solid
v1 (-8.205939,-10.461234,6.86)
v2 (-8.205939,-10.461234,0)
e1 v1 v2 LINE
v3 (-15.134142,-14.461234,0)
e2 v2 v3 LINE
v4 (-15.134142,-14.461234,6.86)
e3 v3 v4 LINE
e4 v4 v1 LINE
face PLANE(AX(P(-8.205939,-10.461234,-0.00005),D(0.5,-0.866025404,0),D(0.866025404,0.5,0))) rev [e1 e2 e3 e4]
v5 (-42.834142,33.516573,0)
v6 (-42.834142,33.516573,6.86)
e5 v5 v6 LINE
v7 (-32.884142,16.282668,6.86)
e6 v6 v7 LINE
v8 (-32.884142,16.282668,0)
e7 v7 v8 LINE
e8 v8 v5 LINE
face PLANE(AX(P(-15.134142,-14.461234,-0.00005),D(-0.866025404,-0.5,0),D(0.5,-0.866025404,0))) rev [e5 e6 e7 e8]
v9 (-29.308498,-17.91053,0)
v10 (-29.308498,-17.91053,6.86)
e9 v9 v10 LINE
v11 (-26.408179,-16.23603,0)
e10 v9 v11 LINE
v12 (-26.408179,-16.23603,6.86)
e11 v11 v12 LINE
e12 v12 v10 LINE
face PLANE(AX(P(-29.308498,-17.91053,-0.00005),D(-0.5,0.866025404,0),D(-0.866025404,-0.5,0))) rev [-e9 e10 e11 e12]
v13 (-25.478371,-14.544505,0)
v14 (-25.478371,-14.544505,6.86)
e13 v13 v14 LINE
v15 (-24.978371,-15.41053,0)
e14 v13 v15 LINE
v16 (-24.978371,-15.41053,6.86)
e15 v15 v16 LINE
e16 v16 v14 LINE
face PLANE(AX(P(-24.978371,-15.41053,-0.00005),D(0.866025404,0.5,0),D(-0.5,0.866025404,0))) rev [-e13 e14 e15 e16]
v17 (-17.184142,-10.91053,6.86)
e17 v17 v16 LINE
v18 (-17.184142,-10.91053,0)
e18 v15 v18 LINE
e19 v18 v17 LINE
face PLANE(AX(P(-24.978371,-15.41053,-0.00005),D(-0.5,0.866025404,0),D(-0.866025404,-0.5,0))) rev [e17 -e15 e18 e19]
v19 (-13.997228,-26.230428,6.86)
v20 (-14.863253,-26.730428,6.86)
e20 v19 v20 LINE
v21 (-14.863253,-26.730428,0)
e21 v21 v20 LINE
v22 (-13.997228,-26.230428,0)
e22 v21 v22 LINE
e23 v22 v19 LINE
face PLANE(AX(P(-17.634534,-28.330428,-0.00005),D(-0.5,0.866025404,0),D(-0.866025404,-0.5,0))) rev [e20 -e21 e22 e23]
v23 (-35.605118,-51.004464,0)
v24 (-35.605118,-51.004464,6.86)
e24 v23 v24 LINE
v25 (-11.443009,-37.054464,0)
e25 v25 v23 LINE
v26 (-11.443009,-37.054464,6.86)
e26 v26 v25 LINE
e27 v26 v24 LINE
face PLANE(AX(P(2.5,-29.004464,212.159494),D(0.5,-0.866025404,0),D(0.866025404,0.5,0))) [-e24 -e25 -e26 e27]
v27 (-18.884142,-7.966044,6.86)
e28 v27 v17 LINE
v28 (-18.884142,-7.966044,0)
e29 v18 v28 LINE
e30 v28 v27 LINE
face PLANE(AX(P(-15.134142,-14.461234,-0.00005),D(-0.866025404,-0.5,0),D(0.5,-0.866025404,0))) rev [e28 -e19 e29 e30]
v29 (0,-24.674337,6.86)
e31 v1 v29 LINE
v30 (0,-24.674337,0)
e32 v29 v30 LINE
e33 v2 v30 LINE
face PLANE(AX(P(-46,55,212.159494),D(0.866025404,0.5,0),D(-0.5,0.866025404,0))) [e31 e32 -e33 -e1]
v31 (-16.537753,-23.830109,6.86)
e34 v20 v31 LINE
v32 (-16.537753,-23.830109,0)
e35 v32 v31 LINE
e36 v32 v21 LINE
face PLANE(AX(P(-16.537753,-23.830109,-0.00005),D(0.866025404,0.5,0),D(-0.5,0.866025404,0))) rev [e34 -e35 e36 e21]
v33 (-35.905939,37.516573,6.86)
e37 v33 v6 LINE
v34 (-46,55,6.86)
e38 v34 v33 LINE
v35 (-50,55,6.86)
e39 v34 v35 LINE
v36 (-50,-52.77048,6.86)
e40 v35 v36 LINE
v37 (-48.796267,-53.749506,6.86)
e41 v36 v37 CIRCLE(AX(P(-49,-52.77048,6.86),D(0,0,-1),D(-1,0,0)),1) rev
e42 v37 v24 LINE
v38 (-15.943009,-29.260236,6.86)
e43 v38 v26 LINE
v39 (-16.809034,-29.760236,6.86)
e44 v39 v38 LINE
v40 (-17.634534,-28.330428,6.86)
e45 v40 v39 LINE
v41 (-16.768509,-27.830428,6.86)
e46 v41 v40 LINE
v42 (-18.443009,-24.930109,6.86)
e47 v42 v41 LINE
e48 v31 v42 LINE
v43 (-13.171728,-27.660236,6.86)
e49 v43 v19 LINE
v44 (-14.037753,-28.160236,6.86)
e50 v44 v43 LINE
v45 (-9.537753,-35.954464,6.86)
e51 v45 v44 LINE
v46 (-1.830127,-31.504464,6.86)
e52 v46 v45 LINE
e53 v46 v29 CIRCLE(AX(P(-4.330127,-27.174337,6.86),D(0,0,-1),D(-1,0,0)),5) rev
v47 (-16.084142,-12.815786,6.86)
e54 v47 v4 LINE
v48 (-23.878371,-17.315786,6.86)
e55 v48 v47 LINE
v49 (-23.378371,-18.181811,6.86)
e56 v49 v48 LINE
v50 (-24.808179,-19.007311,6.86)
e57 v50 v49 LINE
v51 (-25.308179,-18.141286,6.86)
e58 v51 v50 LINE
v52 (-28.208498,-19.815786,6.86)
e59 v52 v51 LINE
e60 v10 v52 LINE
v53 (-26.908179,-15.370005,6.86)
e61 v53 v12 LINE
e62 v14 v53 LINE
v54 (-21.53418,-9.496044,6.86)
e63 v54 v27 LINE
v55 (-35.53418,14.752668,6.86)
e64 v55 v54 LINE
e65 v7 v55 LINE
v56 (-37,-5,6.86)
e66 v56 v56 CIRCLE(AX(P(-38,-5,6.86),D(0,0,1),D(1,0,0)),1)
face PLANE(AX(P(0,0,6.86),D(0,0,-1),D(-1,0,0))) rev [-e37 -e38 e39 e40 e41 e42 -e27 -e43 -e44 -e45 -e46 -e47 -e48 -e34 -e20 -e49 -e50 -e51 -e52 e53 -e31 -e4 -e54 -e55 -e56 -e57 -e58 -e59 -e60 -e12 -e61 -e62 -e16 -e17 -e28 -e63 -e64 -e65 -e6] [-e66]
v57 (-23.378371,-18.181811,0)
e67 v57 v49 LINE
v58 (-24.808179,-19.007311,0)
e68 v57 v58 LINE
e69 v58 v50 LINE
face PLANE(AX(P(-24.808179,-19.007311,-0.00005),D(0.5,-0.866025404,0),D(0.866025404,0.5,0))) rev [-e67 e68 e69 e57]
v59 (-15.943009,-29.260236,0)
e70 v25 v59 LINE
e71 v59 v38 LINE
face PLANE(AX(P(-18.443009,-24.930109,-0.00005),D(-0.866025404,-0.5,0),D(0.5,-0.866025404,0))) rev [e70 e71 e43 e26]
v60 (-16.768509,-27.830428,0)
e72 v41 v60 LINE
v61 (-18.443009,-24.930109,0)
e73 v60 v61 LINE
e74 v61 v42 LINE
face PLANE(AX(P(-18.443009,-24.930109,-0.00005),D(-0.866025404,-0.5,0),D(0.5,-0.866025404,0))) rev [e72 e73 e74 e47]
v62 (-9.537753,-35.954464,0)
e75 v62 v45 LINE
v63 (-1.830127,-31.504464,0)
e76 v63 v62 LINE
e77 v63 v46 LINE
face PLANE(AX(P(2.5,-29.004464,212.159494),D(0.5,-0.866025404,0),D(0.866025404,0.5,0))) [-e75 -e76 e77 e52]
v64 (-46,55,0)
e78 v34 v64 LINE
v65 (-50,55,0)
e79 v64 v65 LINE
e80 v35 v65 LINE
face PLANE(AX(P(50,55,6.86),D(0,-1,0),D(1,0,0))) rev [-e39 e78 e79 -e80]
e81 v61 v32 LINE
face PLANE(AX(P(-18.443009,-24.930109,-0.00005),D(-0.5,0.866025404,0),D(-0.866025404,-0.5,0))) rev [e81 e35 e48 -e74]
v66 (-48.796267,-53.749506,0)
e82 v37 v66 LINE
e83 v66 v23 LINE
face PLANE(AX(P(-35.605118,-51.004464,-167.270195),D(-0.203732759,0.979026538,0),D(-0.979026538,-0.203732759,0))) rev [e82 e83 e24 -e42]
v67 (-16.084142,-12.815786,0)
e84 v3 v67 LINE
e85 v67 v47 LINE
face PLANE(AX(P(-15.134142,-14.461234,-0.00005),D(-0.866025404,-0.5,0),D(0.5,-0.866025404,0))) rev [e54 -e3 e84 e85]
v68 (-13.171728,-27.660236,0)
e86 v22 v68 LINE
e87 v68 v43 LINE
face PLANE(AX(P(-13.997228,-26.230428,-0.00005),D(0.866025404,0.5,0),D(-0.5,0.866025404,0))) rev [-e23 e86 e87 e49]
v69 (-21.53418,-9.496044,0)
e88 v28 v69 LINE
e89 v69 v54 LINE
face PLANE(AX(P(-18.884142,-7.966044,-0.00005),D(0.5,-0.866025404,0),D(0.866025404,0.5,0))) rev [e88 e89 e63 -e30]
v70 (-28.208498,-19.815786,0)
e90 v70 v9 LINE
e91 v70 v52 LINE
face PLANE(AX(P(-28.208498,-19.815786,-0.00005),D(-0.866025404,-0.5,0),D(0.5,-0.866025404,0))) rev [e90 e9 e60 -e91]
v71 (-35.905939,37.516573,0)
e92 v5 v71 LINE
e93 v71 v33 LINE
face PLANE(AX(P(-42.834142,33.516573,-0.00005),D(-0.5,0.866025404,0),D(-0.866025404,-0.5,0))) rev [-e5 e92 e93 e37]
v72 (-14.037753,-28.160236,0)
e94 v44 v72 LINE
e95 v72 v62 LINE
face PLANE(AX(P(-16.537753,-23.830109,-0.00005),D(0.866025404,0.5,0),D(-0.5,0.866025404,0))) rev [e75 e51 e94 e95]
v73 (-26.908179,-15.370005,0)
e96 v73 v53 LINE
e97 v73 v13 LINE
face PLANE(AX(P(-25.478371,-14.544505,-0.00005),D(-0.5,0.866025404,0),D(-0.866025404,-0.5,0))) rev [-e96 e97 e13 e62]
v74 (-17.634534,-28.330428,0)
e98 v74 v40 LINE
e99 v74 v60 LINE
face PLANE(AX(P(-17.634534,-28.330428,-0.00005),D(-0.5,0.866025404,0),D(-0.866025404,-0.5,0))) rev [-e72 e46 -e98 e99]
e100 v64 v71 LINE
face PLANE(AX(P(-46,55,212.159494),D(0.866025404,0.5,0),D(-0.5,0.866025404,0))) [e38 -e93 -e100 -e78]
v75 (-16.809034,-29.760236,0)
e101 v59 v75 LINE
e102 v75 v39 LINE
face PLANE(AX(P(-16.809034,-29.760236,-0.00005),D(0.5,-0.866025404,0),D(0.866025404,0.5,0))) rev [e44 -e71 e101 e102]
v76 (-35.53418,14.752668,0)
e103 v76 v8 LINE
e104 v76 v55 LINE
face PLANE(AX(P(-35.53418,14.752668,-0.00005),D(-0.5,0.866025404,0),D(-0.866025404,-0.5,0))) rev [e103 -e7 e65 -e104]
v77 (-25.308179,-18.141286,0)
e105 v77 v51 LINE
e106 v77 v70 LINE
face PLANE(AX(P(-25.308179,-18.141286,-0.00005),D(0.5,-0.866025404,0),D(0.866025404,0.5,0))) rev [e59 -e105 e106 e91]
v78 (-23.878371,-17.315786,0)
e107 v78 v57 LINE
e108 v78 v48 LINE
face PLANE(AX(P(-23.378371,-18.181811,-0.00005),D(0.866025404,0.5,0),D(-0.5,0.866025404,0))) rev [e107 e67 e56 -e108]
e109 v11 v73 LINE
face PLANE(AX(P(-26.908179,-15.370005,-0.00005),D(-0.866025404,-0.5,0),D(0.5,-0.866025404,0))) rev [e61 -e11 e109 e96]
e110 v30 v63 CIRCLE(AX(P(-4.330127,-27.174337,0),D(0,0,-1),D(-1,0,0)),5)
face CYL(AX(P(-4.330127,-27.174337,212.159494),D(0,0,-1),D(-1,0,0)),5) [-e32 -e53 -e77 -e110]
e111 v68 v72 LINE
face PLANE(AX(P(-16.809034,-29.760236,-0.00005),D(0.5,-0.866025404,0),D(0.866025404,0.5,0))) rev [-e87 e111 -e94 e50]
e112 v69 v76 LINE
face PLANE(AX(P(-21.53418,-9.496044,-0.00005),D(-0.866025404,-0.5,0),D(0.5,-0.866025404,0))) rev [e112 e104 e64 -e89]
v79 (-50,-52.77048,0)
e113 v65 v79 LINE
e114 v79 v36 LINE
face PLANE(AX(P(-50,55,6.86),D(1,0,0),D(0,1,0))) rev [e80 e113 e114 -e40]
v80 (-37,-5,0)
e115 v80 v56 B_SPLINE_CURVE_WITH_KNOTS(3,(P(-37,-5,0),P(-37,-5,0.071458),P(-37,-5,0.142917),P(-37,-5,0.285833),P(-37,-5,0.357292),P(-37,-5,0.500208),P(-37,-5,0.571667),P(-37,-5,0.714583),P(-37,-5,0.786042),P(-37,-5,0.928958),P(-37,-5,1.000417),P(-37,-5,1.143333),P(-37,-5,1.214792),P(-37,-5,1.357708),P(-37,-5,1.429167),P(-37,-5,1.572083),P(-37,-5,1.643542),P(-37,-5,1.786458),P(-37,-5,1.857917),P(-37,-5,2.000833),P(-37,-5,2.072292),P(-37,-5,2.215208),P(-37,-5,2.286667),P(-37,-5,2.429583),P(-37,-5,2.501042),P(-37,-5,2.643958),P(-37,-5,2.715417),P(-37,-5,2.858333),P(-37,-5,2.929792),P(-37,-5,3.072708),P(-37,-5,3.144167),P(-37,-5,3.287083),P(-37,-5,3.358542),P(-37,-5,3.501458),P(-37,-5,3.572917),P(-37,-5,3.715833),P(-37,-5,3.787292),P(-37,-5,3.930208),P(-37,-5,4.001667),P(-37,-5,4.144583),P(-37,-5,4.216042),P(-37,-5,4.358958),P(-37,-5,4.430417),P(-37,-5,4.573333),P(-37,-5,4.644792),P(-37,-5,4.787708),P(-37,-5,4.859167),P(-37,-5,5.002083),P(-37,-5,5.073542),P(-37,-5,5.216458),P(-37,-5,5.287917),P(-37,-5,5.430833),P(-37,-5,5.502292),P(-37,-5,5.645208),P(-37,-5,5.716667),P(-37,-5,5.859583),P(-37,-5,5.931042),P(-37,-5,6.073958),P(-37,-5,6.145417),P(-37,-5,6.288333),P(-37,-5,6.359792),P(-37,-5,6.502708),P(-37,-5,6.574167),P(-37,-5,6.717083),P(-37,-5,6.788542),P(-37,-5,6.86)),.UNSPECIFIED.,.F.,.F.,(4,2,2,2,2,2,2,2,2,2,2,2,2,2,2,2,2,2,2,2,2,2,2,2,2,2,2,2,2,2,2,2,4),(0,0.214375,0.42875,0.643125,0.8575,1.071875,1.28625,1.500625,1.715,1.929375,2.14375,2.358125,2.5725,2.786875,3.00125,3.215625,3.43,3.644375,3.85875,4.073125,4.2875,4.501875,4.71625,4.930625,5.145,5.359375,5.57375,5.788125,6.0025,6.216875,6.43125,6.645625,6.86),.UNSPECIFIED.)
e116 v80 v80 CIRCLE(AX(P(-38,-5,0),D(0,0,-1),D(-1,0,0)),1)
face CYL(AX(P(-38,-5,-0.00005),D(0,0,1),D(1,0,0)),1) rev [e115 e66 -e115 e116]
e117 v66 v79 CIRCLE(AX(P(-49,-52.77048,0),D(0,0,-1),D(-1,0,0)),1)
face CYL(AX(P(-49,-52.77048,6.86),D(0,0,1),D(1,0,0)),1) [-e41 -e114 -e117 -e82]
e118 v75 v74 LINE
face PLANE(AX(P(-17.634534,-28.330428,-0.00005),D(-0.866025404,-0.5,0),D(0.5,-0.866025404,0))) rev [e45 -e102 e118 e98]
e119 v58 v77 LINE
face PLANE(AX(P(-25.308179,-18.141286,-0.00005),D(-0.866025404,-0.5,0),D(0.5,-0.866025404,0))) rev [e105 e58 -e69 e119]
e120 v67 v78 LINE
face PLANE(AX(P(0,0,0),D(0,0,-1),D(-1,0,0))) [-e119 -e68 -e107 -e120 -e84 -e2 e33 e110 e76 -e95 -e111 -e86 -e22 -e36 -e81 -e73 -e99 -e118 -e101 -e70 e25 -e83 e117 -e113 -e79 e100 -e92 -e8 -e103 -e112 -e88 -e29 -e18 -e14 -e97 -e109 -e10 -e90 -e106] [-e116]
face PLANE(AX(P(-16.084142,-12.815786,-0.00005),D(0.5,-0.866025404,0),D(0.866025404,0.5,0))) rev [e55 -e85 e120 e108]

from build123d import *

# Parameters (mm, degrees)
SKETCH1_W                = 100
SKETCH1_H                = 110
BOSS_EXTRUDE1_DEPTH      = 6.86
BOSS_EXTRUDE2_DEPTH      = 6.86
CUT_EXTRUDE1_DEPTH       = 84.419927529
CUT_EXTRUDE1_DEPTH_BACK  = 84.419927529
CUT_EXTRUDE5_DEPTH       = 84.419927529
CUT_EXTRUDE6_DEPTH       = 84.419927529
SKETCH7_W                = 42
SKETCH7_H                = 3.55
CUT_EXTRUDE7_DEPTH       = 84.419927529
SKETCH8_W                = 5
SKETCH8_H                = 7.62
CUT_EXTRUDE8_DEPTH       = 84.419927529
CUT_EXTRUDE9_DEPTH       = 84.419927529
LPATTERN1_COUNT          = 2
LPATTERN1_PITCH          = 49.4
SKETCH15_W               = 6.5
SKETCH15_H               = 9.5
BOSS_EXTRUDE3_DEPTH      = 6.86
CUT_EXTRUDE14_START      = -6.86
CUT_EXTRUDE14_DEPTH      = 6.86
BOSS_EXTRUDE4_DEPTH      = 6.86
FILLET3_R                = 5
FILLET4_R                = 7
CUT_EXTRUDE11_DEPTH      = 84.419927529
BOSS_EXTRUDE5_DEPTH      = 6.86
CUT_EXTRUDE12_DEPTH      = 84.419927529
CUT_EXTRUDE12_DEPTH_BACK = 84.419927529
SKETCH21_R               = 1
CUT_EXTRUDE13_DEPTH      = 84.419927529
CUT_EXTRUDE15_DEPTH      = 84.419927529
CUT_EXTRUDE15_DEPTH_BACK = 84.419927529
CUT_EXTRUDE16_DEPTH      = 84.419927529
CUT_EXTRUDE16_DEPTH_BACK = 84.419927529
FILLET2_R                = 1
BOSS_EXTRUDE6_DEPTH      = 6.86
CUT_EXTRUDE17_DEPTH      = 84.419927529
BOSS_EXTRUDE9_DEPTH      = 6.86


# Read off the part's stored shape, not the designer's step: Cut-Extrude14
with BuildPart() as part:
    # Sketch1 → Boss-Extrude1 (new body)
    with BuildSketch(Plane.XY):
        Rectangle(SKETCH1_W, SKETCH1_H)
    extrude(amount=BOSS_EXTRUDE1_DEPTH)

    # Sketch14 → Boss-Extrude2 (add)
    with BuildSketch(Plane.XY.offset(6.86)):
        with BuildLine():
            Line((-50, 44), (-56.9, 44))
            Line((-56.9, 44), (-57.252653961, 46))
            Line((-57.252653961, 46), (-60.252653961, 46))
            ThreePointArc((-60.252653961, 46), (-62.140394827, 27.177051725), (-56.9, 9))
            Line((-56.9, 9), (-50, 9))
            Line((-50, 9), (-50, 44))
        make_face()
    extrude(amount=-BOSS_EXTRUDE2_DEPTH)

    # Sketch9 → Cut-Extrude1 (cut, two sides: drawn at the far end of the back side and taken through both)
    with BuildSketch(Plane.XY.offset(6.86).offset(-CUT_EXTRUDE1_DEPTH_BACK)):
        Polygon((-202.691345573, 326.397371639), (-46, 55), (2.5, -29.004464167), (-49.825975731, -59.214880341), (-321.22334737, -215.906225914), (291.08659924, -349.739606366), (409.618601037, 192.563991188), align=None)
    extrude(amount=CUT_EXTRUDE1_DEPTH + CUT_EXTRUDE1_DEPTH_BACK, mode=Mode.SUBTRACT)

    # Sketch11 → Cut-Extrude5 (cut, through all)
    with BuildSketch(Plane.XY.offset(6.86)):
        Polygon((-35.90593882, 37.516573181), (-8.20593882, -10.461234188), (-15.13414205, -14.461234188), (-42.83414205, 33.516573181), align=None)
    extrude(amount=-CUT_EXTRUDE5_DEPTH, mode=Mode.SUBTRACT)

    # Sketch12 → Cut-Extrude6 (cut, through all)
    with BuildSketch(Plane.XY.offset(6.86)):
        Polygon((-18.88414205, -7.96604366), (-21.534179786, -9.49604366), (-35.534179786, 14.752667646), (-32.88414205, 16.282667646), align=None)
    extrude(amount=-CUT_EXTRUDE6_DEPTH, mode=Mode.SUBTRACT)

    # Sketch7 → Cut-Extrude7 (cut, through all)
    with BuildSketch(Plane.XY.offset(6.86)):
        with Locations((-50, -34)):
            Rectangle(SKETCH7_W, SKETCH7_H)
    extrude(amount=-CUT_EXTRUDE7_DEPTH, mode=Mode.SUBTRACT)

    # Sketch8 → Cut-Extrude8 (cut, through all)
    with BuildSketch(Plane.XY.offset(6.86)):
        with Locations((-36.5, -34)):
            Rectangle(SKETCH8_W, SKETCH8_H)
    extrude(amount=-CUT_EXTRUDE8_DEPTH, mode=Mode.SUBTRACT)

    # Sketch13 → Cut-Extrude9 (cut, through all)
    with BuildSketch(Plane.XY.offset(6.86)):
        Polygon((-41.88414205, 31.871124914), (-40.78414205, 29.965869026), (-48.578370684, 25.465869026), (-48.078370684, 24.599843622), (-49.508178626, 23.774343622), (-50.008178626, 24.640369026), (-52.908497703, 22.965869026), (-54.008497703, 24.871124914), (-51.108178626, 26.545624914), (-51.608178626, 27.411650318), (-50.178370684, 28.237150318), (-49.678370684, 27.371124914), align=None)
        Polygon((-39.45593882, 43.665353548), (-38.35593882, 41.76009766), (-46.150167454, 37.26009766), (-45.650167454, 36.394072256), (-47.079975396, 35.568572256), (-47.579975396, 36.43459766), (-50.480294473, 34.76009766), (-51.580294473, 36.665353548), (-48.679975396, 38.339853548), (-49.179975396, 39.205878952), (-47.750167454, 40.031378952), (-47.250167454, 39.165353548), align=None)
        Polygon((-18.443009001, -24.930108514), (-11.443009001, -37.054464167), (-9.537753113, -35.954464167), (-16.537753113, -23.830108514), align=None)
    cut_extrude9 = extrude(amount=-CUT_EXTRUDE9_DEPTH, mode=Mode.SUBTRACT)

    # LPattern1: Cut-Extrude9 ×2
    with Locations(*[Vector(0.4999999999999939, -0.8660254037844421, 0) * (i * LPATTERN1_PITCH) for i in range(1, LPATTERN1_COUNT)]):
        add(cut_extrude9, mode=Mode.SUBTRACT)

    # Sketch15 → Boss-Extrude3 (add)
    with BuildSketch(Plane.XY.offset(6.86)):
        with Locations((-53.25, -19.75)):
            Rectangle(SKETCH15_W, SKETCH15_H)
    extrude(amount=-BOSS_EXTRUDE3_DEPTH)

    # Cut-Extrude14 outline → Cut-Extrude14 (cut)
    with BuildSketch(Plane.XY.offset(6.86).offset(CUT_EXTRUDE14_START)):
        Polygon((-56.5, -15), (-56.5, -16.500643242), (-50, -15), align=None)
    extrude(amount=CUT_EXTRUDE14_DEPTH, mode=Mode.SUBTRACT)

    # Sketch16 → Boss-Extrude4 (add)
    with BuildSketch(Plane.XY.offset(6.86)):
        Polygon((-35.605117767, -51.004464167), (-34.105117767, -53.602540378), (-36.525588833, -55), (-42.525588833, -55), (-44.558274136, -51.479285778), align=None)
    extrude(amount=-BOSS_EXTRUDE4_DEPTH)

    # Fillet3
    fillet3_edges = [part.edges().sort_by_distance(p)[0] for p in [
        (2.5, -29.004464167, 3.43),
    ]]
    fillet(fillet3_edges, radius=FILLET3_R)

    # Fillet4
    fillet4_edges = [part.edges().sort_by_distance(p)[0] for p in [
        (-56.9, 9, 3.43),
    ]]
    fillet(fillet4_edges, radius=FILLET4_R)

    # Sketch18 → Cut-Extrude11 (cut, through all)
    with BuildSketch(Plane.XY.offset(6.86)):
        Polygon((-17.634534405, -28.330427591), (-13.997227709, -26.230427591), (-13.171727709, -27.660235533), (-16.809034405, -29.760235533), align=None)
    extrude(amount=-CUT_EXTRUDE11_DEPTH, mode=Mode.SUBTRACT)

    # Sketch19 → Boss-Extrude5 (add)
    with BuildSketch(Plane.XY.offset(6.86)):
        Polygon((-24.334179786, -4.646301399), (-23.234179786, -6.551557287), (-25.780294473, -8.021557287), (-26.880294473, -6.116301399), align=None)
    extrude(amount=-BOSS_EXTRUDE5_DEPTH)

    # Sketch20 → Cut-Extrude12 (cut, two sides: drawn at the far end of the back side and taken through both)
    with BuildSketch(Plane.XY.offset(6.86).offset(-CUT_EXTRUDE12_DEPTH_BACK)):
        Polygon((-50, 55), (-50, 44), (-48.060403212, 55), align=None)
    extrude(amount=CUT_EXTRUDE12_DEPTH + CUT_EXTRUDE12_DEPTH_BACK, mode=Mode.SUBTRACT)

    # Sketch21 → Cut-Extrude13 (cut, through all)
    with BuildSketch(Plane.XY.offset(6.86)):
        with Locations((-38, -5)):
            Circle(SKETCH21_R)
    extrude(amount=-CUT_EXTRUDE13_DEPTH, mode=Mode.SUBTRACT)

    # Sketch23 → Cut-Extrude15 (cut, two sides: drawn at the far end of the back side and taken through both)
    with BuildSketch(Plane.XY.offset(6.86).offset(-CUT_EXTRUDE15_DEPTH_BACK)):
        Polygon((207.425051562, 16.452548282), (-35.605117767, -51.004464167), (-50, -55), (-293.030169328, -122.457012449), (-158.11614443, -608.517351106), (342.33907646, -469.607790375), align=None)
    extrude(amount=CUT_EXTRUDE15_DEPTH + CUT_EXTRUDE15_DEPTH_BACK, mode=Mode.SUBTRACT)

    # Sketch25 → Cut-Extrude16 (cut, two sides: drawn at the far end of the back side and taken through both)
    with BuildSketch(Plane(origin=(0, 0, 0), x_dir=(-1, 0, 0), z_dir=(0, 0, -1)).offset(-CUT_EXTRUDE16_DEPTH_BACK)):
        Polygon((-209.546353054, 0.01089), (35.605117767, -51.004464167), (50, -54), (295.15147082, -105.015354167), (193.120762486, -595.318295807), (-311.577061387, -490.29205164), align=None)
    extrude(amount=CUT_EXTRUDE16_DEPTH + CUT_EXTRUDE16_DEPTH_BACK, mode=Mode.SUBTRACT)

    # Fillet2
    fillet2_edges = [part.edges().sort_by_distance(p)[0] for p in [
        (-60.252653961, 46, 3.43),
        (-56.5, -24.5, 3.43),
        (-56.5, -16.500643242, 3.43),
        (-50, -54, 3.43),
    ]]
    fillet(fillet2_edges, radius=FILLET2_R)

    # Sketch26 → Boss-Extrude6 (add)
    with BuildSketch(Plane(origin=(0, 0, 0), x_dir=(-1, 0, 0), z_dir=(0, 0, -1))):
        with BuildLine():
            Line((56.5, -15), (50, -15))
            Line((50, -15), (55.724951054, -16.321709094))
            ThreePointArc((55.724951054, -16.321709094), (56.282608157, -16.673564522), (56.5, -17.296079159))
            Line((56.5, -17.296079159), (56.5, -15))
        make_face()
        Polygon((47.579975396, 36.43459766), (50, 35.037395803), (50, 37.577736987), (48.679975396, 38.339853548), (49.179975396, 39.205878952), (47.750167454, 40.031378952), (47.250167454, 39.165353548), (39.45593882, 43.665353548), (38.35593882, 41.76009766), (46.150167454, 37.26009766), (45.650167454, 36.394072256), (47.079975396, 35.568572256), align=None)
        Polygon((49.678370684, 27.371124914), (41.88414205, 31.871124914), (40.78414205, 29.965869026), (48.578370684, 25.465869026), (48.078370684, 24.599843622), (49.508178626, 23.774343622), (50, 24.62620323), (50, 27.92820323), align=None)
        with BuildLine():
            ThreePointArc((56.5, -23.5), (56.207106781, -24.207106781), (55.5, -24.5))
            Line((55.5, -24.5), (56.5, -24.5))
            Line((56.5, -24.5), (56.5, -23.5))
        make_face()
    extrude(amount=-BOSS_EXTRUDE6_DEPTH)

    # Sketch26<3> → Cut-Extrude17 (cut, through all)
    with BuildSketch(Plane(origin=(0, 0, 0), x_dir=(-1, 0, 0), z_dir=(0, 0, -1))):
        with BuildLine():
            Line((50, 35.037395803), (50, 27.92820323))
            Line((50, 27.92820323), (50.178370684, 28.237150318))
            Line((50.178370684, 28.237150318), (51.608178626, 27.411650318))
            Line((51.608178626, 27.411650318), (51.108178626, 26.545624914))
            Line((51.108178626, 26.545624914), (54.008497703, 24.871124914))
            Line((54.008497703, 24.871124914), (52.908497703, 22.965869026))
            Line((52.908497703, 22.965869026), (50.008178626, 24.640369026))
            Line((50.008178626, 24.640369026), (50, 24.62620323))
            Line((50, 24.62620323), (50, 9))
            Line((50, 9), (52.380008746, 9))
            ThreePointArc((52.380008746, 9), (56.324728806, 10.217337668), (58.897432775, 13.445947531))
            ThreePointArc((58.897432775, 13.445947531), (62.283923616, 29.230647449), (60.464218102, 45.271649399))
            ThreePointArc((60.464218102, 45.271649399), (60.105291207, 45.797386167), (59.50182182, 46))
            Line((59.50182182, 46), (57.252653961, 46))
            Line((57.252653961, 46), (56.9, 44))
            Line((56.9, 44), (50, 44))
            Line((50, 44), (50, 37.577736987))
            Line((50, 37.577736987), (51.580294473, 36.665353548))
            Line((51.580294473, 36.665353548), (50.480294473, 34.76009766))
            Line((50.480294473, 34.76009766), (50, 35.037395803))
        make_face()
        with BuildLine():
            Line((55.724951054, -16.321709094), (50, -15))
            Line((50, -15), (50, -24.5))
            Line((50, -24.5), (55.5, -24.5))
            ThreePointArc((55.5, -24.5), (56.207106781, -24.207106781), (56.5, -23.5))
            Line((56.5, -23.5), (56.5, -17.296079159))
            ThreePointArc((56.5, -17.296079159), (56.282608157, -16.673564522), (55.724951054, -16.321709094))
        make_face()
        with BuildLine():
            Line((56.5, -15), (50, -15))
            Line((50, -15), (55.724951054, -16.321709094))
            ThreePointArc((55.724951054, -16.321709094), (56.282608157, -16.673564522), (56.5, -17.296079159))
            Line((56.5, -17.296079159), (56.5, -15))
        make_face()
        with BuildLine():
            ThreePointArc((56.5, -23.5), (56.207106781, -24.207106781), (55.5, -24.5))
            Line((55.5, -24.5), (56.5, -24.5))
            Line((56.5, -24.5), (56.5, -23.5))
        make_face()
    extrude(amount=-CUT_EXTRUDE17_DEPTH, mode=Mode.SUBTRACT)

    # Sketch29 → Boss-Extrude9 (add)
    with BuildSketch(Plane(origin=(0, 0, 0), x_dir=(-1, 0, 0), z_dir=(0, 0, -1))):
        Polygon((39, -35.775), (50, -35.775), (50, -32.225), (39, -32.225), (39, -30.19), (34, -30.19), (34, -32.225), (29, -32.225), (29, -35.775), (34, -35.775), (34, -37.81), (39, -37.81), align=None)
        Polygon((50, 44), (50, 55), (48.060403212, 55), align=None)
    extrude(amount=-BOSS_EXTRUDE9_DEPTH)


solid = part.part
